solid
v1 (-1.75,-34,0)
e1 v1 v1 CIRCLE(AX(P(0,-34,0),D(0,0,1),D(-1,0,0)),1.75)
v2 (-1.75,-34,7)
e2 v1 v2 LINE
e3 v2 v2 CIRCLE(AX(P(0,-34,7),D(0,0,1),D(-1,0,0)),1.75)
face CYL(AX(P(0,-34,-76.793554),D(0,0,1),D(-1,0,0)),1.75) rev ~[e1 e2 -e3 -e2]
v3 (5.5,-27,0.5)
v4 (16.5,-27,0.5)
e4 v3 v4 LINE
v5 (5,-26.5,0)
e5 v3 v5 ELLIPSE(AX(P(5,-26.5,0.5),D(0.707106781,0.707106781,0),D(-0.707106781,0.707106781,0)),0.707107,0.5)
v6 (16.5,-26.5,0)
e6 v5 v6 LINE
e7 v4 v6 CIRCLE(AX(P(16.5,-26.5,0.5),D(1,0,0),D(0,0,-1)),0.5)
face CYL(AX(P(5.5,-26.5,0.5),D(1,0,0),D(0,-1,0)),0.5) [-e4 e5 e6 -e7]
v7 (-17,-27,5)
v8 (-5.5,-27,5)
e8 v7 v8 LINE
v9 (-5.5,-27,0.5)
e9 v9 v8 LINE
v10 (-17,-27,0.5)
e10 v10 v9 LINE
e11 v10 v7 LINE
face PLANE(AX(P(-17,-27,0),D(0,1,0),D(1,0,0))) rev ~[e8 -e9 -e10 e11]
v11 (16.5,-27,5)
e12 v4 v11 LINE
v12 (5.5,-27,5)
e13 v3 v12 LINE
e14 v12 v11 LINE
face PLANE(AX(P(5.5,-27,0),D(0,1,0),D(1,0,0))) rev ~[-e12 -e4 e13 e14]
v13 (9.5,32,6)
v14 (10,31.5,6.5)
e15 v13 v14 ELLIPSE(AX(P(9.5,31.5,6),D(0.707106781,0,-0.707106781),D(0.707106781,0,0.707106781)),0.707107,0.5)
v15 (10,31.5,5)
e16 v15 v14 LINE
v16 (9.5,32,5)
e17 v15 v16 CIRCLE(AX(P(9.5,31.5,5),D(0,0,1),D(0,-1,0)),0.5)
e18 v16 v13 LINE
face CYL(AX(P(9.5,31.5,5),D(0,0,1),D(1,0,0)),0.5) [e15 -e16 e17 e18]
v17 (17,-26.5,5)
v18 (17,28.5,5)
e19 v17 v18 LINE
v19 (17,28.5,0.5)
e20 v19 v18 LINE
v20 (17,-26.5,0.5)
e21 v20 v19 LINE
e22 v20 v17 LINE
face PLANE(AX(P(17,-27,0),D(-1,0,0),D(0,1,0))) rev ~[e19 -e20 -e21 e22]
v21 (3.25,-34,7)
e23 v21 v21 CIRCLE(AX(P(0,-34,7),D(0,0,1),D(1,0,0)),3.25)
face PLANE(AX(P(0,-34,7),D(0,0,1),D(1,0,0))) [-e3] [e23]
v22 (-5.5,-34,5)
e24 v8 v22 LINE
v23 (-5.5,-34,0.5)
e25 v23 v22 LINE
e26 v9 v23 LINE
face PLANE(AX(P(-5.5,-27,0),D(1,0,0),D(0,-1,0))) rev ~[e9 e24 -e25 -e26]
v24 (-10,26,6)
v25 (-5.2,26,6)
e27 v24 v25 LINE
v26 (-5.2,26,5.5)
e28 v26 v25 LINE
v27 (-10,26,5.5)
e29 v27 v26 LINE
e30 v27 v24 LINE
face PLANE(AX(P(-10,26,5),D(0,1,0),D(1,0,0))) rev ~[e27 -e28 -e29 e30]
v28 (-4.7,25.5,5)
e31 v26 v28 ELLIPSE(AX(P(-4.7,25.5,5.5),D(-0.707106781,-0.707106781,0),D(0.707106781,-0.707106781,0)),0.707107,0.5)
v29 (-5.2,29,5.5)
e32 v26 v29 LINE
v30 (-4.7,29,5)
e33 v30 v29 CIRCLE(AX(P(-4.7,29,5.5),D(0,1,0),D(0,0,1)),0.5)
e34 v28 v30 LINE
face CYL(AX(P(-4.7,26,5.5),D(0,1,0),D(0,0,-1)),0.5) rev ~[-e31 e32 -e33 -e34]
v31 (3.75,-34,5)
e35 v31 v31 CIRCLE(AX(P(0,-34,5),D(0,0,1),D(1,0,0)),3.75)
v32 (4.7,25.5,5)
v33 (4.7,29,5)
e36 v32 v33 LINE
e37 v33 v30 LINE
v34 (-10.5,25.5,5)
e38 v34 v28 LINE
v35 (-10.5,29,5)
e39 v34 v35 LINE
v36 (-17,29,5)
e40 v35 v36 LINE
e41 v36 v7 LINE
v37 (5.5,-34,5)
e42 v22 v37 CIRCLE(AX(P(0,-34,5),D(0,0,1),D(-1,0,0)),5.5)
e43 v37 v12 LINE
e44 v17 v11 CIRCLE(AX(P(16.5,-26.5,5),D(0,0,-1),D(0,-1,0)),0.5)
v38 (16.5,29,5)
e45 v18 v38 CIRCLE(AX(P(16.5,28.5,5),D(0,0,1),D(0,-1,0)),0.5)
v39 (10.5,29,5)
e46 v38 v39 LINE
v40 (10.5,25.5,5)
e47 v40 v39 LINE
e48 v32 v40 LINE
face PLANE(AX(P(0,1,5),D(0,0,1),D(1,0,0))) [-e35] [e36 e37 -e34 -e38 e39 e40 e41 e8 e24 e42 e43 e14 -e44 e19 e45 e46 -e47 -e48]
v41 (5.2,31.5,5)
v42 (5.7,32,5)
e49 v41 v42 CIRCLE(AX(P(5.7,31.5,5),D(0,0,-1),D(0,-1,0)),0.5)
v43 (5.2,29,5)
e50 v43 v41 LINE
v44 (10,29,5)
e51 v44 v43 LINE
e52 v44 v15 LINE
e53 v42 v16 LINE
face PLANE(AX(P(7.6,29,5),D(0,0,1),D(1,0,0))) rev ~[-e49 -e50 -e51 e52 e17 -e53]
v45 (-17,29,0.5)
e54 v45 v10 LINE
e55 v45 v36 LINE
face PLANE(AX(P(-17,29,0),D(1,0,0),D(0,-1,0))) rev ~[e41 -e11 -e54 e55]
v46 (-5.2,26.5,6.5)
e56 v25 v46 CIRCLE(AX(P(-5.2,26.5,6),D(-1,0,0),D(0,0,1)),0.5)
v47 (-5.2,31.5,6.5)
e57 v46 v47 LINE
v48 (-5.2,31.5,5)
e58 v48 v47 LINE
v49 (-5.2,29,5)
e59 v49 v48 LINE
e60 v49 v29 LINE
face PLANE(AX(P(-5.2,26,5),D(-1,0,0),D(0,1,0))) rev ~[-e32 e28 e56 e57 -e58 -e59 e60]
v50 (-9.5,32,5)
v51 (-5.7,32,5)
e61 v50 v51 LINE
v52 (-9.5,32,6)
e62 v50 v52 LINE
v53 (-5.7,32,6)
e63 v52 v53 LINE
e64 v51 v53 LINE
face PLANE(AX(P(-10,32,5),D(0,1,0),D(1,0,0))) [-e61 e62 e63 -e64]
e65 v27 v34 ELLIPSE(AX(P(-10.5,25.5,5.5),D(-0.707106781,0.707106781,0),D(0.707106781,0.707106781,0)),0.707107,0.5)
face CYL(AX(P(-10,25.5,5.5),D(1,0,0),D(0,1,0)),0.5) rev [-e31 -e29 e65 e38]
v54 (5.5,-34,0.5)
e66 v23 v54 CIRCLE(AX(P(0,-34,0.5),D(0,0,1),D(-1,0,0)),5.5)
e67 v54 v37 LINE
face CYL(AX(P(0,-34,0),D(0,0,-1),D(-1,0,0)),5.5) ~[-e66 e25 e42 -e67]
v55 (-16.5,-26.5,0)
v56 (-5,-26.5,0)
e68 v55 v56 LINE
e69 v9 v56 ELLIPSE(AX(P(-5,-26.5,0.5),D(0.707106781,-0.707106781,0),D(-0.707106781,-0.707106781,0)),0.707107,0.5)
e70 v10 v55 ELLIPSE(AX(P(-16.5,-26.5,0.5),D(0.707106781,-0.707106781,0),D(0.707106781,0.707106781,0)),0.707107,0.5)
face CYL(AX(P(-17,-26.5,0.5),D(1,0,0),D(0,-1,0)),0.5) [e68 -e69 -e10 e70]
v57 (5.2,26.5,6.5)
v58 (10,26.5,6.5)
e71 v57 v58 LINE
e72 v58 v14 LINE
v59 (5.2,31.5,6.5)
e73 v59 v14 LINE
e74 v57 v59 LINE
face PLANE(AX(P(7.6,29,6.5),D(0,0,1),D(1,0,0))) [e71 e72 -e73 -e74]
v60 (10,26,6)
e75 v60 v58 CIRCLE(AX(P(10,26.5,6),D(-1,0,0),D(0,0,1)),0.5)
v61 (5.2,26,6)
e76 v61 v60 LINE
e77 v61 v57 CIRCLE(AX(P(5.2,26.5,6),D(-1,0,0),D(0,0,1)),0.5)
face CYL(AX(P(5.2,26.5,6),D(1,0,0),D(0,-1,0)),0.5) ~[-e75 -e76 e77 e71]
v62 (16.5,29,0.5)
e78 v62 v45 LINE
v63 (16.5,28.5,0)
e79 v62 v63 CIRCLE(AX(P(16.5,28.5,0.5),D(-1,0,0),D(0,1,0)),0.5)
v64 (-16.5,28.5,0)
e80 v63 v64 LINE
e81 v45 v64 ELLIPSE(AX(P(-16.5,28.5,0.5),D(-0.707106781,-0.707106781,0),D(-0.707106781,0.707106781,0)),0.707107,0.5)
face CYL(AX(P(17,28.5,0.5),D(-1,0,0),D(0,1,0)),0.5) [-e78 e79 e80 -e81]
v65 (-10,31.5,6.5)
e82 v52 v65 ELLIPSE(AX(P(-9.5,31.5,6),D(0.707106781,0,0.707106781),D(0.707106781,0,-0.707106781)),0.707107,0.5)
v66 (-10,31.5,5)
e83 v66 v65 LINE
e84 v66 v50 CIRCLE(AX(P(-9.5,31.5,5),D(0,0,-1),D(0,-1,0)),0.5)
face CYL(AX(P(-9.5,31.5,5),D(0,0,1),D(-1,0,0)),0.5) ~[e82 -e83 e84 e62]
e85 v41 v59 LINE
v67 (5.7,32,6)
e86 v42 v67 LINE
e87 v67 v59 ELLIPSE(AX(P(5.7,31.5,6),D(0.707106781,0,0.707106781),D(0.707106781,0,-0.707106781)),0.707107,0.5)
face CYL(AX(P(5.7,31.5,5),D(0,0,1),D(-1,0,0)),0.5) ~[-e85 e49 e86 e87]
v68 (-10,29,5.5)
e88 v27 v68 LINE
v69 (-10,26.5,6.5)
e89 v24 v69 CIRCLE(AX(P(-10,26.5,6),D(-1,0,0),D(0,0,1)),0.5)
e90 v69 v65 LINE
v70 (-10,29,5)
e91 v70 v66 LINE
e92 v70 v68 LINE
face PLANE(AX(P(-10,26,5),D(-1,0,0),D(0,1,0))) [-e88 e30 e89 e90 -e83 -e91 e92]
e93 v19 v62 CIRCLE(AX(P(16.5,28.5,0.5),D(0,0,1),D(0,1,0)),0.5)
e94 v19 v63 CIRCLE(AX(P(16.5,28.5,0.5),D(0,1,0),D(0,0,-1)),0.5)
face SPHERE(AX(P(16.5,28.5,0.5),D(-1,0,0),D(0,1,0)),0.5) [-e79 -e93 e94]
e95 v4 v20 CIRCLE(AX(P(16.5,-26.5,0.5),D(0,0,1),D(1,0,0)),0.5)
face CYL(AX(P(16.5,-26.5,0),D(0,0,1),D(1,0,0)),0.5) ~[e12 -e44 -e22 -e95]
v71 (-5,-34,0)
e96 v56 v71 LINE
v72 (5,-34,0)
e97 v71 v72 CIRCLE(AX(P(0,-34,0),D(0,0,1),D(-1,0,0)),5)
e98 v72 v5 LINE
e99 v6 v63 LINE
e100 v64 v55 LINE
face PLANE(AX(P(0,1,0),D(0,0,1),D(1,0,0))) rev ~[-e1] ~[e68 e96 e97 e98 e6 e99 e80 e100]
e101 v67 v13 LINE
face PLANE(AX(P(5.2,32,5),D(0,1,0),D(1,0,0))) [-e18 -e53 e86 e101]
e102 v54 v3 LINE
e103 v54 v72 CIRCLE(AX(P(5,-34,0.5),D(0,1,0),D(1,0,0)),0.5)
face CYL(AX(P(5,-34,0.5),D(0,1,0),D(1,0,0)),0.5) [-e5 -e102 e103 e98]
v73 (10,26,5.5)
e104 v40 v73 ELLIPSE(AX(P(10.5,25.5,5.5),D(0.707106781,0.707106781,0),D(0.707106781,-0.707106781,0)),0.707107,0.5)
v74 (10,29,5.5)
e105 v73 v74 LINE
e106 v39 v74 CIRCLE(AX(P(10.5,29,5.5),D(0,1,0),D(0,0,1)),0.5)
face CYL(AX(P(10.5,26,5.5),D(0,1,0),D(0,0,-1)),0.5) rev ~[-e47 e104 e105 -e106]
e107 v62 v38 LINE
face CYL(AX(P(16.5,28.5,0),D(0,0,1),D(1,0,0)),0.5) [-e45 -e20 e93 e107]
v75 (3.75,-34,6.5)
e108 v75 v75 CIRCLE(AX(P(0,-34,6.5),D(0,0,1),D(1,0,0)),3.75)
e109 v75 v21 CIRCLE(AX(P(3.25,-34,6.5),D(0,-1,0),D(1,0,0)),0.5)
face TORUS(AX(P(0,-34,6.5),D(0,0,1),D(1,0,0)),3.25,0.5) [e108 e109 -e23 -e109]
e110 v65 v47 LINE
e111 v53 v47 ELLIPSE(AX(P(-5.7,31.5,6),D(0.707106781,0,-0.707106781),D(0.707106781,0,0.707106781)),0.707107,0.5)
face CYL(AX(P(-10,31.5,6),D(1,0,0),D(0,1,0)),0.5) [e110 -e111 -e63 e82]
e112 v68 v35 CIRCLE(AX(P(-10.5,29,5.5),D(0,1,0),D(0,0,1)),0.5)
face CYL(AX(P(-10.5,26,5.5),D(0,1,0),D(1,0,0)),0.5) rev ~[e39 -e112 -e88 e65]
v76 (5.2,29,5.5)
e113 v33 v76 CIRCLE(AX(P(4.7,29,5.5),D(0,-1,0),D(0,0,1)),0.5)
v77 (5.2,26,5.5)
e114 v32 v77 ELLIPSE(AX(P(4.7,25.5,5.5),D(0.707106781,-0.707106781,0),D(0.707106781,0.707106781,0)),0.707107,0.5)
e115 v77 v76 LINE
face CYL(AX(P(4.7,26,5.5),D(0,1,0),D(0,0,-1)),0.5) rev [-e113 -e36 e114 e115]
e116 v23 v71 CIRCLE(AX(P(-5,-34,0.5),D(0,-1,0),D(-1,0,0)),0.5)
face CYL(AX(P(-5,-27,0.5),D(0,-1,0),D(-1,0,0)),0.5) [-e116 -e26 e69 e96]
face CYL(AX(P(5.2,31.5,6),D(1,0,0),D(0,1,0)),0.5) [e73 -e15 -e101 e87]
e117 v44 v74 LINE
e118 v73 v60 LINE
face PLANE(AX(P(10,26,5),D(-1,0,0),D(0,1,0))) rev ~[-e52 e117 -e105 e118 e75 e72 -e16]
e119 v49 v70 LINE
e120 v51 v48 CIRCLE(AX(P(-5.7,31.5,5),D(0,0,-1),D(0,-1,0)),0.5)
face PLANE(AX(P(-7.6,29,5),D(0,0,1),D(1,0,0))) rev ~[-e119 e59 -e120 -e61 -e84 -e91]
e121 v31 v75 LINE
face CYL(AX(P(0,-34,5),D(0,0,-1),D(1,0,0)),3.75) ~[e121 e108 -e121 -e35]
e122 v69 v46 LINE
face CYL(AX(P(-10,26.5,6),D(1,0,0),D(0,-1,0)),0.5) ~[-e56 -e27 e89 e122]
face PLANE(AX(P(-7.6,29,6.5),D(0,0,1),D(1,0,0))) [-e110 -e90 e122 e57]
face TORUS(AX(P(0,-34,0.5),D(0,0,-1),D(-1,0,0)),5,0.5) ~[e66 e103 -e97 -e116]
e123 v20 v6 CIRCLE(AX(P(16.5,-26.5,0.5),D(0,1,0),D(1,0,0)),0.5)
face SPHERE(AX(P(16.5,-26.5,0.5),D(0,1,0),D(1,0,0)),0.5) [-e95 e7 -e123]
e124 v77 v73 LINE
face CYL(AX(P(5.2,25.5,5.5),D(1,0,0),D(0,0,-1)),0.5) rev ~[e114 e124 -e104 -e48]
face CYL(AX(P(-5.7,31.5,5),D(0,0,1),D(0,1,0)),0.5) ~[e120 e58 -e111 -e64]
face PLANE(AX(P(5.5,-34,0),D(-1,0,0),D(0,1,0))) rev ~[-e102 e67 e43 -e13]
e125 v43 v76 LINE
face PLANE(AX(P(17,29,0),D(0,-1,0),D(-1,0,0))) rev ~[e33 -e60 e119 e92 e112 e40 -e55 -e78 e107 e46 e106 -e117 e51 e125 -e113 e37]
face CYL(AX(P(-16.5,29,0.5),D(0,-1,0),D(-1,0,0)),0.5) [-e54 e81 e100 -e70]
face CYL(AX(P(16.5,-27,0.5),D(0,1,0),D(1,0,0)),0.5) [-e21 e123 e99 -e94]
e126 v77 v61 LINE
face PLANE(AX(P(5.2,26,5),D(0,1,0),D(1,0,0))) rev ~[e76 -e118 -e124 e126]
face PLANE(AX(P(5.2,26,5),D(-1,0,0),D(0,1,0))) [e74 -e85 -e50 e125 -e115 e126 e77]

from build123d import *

# Parameters (mm, degrees)
F1_DEPTH = 5
F2_R     = 3.75
F3_DEPTH = 2
F4_D     = 3.5
F5_W     = 4.8
F5_H     = 6
F6_DEPTH = 1.5
F7_R     = 0.5


with BuildPart() as f1:
    # F0 (on Top) → F1 (new body)
    with BuildSketch(Plane.XY):
        Polygon((17, 29), (-17, 29), (-17, -27), (-5.5, -27), (5.5, -27), (17, -27), align=None)
        with BuildLine():
            Line((5.5, -27), (-5.5, -27))
            Line((-5.5, -27), (-5.5, -34))
            ThreePointArc((-5.5, -34), (0, -28.5), (5.5, -34))
            Line((5.5, -34), (5.5, -27))
        make_face()
        with BuildLine():
            ThreePointArc((5.5, -34), (0, -28.5), (-5.5, -34))
            ThreePointArc((-5.5, -34), (0, -39.5), (5.5, -34))
        make_face()
    extrude(amount=F1_DEPTH)

    # F2 (on face) → F3 (join)
    with BuildSketch(Plane.XY.offset(5)):
        with Locations((0, -34)):
            Circle(F2_R)
    extrude(amount=F3_DEPTH)

    # F4 (through all)
    with Locations(Plane(origin=(0, 0, 0), x_dir=(1, 0, 0), z_dir=(0, 0, -1))):
        with Locations((0, 34)):
            Hole(F4_D / 2)

    # F5 (on face) → F6 (join)
    with BuildSketch(Plane.XY.offset(5)):
        with Locations((-7.6, 29)):
            Rectangle(F5_W, F5_H)
        with Locations((7.6, 29)):
            Rectangle(F5_W, F5_H)
    extrude(amount=F6_DEPTH)

    # F7
    f7_edges = [f1.edges().sort_by_distance(p)[0] for p in [
        (7.6, 26, 6.5),
        (-7.6, 26, 6.5),
        (-7.6, 32, 6.5),
        (7.6, 32, 6.5),
        (0, 29, 0),
        (17, 29, 2.5),
        (17, 1, 0),
        (17, -27, 2.5),
        (5.5, -30.5, 0),
        (0, -39.5, 0),
        (-3.75, -34, 7),
        (11.25, -27, 0),
        (-11.25, -27, 0),
        (-17, 1, 0),
        (10, 32, 5.75),
        (5.2, 32, 5.75),
        (-5.2, 32, 5.75),
        (-10, 32, 5.75),
        (-7.6, 26, 5),
        (7.6, 26, 5),
        (5.2, 27.5, 5),
        (-10, 27.5, 5),
        (-5.2, 27.5, 5),
        (10, 27.5, 5),
        (-5.5, -30.5, 0),
    ]]
    fillet(f7_edges, radius=F7_R)


solid = f1.part
